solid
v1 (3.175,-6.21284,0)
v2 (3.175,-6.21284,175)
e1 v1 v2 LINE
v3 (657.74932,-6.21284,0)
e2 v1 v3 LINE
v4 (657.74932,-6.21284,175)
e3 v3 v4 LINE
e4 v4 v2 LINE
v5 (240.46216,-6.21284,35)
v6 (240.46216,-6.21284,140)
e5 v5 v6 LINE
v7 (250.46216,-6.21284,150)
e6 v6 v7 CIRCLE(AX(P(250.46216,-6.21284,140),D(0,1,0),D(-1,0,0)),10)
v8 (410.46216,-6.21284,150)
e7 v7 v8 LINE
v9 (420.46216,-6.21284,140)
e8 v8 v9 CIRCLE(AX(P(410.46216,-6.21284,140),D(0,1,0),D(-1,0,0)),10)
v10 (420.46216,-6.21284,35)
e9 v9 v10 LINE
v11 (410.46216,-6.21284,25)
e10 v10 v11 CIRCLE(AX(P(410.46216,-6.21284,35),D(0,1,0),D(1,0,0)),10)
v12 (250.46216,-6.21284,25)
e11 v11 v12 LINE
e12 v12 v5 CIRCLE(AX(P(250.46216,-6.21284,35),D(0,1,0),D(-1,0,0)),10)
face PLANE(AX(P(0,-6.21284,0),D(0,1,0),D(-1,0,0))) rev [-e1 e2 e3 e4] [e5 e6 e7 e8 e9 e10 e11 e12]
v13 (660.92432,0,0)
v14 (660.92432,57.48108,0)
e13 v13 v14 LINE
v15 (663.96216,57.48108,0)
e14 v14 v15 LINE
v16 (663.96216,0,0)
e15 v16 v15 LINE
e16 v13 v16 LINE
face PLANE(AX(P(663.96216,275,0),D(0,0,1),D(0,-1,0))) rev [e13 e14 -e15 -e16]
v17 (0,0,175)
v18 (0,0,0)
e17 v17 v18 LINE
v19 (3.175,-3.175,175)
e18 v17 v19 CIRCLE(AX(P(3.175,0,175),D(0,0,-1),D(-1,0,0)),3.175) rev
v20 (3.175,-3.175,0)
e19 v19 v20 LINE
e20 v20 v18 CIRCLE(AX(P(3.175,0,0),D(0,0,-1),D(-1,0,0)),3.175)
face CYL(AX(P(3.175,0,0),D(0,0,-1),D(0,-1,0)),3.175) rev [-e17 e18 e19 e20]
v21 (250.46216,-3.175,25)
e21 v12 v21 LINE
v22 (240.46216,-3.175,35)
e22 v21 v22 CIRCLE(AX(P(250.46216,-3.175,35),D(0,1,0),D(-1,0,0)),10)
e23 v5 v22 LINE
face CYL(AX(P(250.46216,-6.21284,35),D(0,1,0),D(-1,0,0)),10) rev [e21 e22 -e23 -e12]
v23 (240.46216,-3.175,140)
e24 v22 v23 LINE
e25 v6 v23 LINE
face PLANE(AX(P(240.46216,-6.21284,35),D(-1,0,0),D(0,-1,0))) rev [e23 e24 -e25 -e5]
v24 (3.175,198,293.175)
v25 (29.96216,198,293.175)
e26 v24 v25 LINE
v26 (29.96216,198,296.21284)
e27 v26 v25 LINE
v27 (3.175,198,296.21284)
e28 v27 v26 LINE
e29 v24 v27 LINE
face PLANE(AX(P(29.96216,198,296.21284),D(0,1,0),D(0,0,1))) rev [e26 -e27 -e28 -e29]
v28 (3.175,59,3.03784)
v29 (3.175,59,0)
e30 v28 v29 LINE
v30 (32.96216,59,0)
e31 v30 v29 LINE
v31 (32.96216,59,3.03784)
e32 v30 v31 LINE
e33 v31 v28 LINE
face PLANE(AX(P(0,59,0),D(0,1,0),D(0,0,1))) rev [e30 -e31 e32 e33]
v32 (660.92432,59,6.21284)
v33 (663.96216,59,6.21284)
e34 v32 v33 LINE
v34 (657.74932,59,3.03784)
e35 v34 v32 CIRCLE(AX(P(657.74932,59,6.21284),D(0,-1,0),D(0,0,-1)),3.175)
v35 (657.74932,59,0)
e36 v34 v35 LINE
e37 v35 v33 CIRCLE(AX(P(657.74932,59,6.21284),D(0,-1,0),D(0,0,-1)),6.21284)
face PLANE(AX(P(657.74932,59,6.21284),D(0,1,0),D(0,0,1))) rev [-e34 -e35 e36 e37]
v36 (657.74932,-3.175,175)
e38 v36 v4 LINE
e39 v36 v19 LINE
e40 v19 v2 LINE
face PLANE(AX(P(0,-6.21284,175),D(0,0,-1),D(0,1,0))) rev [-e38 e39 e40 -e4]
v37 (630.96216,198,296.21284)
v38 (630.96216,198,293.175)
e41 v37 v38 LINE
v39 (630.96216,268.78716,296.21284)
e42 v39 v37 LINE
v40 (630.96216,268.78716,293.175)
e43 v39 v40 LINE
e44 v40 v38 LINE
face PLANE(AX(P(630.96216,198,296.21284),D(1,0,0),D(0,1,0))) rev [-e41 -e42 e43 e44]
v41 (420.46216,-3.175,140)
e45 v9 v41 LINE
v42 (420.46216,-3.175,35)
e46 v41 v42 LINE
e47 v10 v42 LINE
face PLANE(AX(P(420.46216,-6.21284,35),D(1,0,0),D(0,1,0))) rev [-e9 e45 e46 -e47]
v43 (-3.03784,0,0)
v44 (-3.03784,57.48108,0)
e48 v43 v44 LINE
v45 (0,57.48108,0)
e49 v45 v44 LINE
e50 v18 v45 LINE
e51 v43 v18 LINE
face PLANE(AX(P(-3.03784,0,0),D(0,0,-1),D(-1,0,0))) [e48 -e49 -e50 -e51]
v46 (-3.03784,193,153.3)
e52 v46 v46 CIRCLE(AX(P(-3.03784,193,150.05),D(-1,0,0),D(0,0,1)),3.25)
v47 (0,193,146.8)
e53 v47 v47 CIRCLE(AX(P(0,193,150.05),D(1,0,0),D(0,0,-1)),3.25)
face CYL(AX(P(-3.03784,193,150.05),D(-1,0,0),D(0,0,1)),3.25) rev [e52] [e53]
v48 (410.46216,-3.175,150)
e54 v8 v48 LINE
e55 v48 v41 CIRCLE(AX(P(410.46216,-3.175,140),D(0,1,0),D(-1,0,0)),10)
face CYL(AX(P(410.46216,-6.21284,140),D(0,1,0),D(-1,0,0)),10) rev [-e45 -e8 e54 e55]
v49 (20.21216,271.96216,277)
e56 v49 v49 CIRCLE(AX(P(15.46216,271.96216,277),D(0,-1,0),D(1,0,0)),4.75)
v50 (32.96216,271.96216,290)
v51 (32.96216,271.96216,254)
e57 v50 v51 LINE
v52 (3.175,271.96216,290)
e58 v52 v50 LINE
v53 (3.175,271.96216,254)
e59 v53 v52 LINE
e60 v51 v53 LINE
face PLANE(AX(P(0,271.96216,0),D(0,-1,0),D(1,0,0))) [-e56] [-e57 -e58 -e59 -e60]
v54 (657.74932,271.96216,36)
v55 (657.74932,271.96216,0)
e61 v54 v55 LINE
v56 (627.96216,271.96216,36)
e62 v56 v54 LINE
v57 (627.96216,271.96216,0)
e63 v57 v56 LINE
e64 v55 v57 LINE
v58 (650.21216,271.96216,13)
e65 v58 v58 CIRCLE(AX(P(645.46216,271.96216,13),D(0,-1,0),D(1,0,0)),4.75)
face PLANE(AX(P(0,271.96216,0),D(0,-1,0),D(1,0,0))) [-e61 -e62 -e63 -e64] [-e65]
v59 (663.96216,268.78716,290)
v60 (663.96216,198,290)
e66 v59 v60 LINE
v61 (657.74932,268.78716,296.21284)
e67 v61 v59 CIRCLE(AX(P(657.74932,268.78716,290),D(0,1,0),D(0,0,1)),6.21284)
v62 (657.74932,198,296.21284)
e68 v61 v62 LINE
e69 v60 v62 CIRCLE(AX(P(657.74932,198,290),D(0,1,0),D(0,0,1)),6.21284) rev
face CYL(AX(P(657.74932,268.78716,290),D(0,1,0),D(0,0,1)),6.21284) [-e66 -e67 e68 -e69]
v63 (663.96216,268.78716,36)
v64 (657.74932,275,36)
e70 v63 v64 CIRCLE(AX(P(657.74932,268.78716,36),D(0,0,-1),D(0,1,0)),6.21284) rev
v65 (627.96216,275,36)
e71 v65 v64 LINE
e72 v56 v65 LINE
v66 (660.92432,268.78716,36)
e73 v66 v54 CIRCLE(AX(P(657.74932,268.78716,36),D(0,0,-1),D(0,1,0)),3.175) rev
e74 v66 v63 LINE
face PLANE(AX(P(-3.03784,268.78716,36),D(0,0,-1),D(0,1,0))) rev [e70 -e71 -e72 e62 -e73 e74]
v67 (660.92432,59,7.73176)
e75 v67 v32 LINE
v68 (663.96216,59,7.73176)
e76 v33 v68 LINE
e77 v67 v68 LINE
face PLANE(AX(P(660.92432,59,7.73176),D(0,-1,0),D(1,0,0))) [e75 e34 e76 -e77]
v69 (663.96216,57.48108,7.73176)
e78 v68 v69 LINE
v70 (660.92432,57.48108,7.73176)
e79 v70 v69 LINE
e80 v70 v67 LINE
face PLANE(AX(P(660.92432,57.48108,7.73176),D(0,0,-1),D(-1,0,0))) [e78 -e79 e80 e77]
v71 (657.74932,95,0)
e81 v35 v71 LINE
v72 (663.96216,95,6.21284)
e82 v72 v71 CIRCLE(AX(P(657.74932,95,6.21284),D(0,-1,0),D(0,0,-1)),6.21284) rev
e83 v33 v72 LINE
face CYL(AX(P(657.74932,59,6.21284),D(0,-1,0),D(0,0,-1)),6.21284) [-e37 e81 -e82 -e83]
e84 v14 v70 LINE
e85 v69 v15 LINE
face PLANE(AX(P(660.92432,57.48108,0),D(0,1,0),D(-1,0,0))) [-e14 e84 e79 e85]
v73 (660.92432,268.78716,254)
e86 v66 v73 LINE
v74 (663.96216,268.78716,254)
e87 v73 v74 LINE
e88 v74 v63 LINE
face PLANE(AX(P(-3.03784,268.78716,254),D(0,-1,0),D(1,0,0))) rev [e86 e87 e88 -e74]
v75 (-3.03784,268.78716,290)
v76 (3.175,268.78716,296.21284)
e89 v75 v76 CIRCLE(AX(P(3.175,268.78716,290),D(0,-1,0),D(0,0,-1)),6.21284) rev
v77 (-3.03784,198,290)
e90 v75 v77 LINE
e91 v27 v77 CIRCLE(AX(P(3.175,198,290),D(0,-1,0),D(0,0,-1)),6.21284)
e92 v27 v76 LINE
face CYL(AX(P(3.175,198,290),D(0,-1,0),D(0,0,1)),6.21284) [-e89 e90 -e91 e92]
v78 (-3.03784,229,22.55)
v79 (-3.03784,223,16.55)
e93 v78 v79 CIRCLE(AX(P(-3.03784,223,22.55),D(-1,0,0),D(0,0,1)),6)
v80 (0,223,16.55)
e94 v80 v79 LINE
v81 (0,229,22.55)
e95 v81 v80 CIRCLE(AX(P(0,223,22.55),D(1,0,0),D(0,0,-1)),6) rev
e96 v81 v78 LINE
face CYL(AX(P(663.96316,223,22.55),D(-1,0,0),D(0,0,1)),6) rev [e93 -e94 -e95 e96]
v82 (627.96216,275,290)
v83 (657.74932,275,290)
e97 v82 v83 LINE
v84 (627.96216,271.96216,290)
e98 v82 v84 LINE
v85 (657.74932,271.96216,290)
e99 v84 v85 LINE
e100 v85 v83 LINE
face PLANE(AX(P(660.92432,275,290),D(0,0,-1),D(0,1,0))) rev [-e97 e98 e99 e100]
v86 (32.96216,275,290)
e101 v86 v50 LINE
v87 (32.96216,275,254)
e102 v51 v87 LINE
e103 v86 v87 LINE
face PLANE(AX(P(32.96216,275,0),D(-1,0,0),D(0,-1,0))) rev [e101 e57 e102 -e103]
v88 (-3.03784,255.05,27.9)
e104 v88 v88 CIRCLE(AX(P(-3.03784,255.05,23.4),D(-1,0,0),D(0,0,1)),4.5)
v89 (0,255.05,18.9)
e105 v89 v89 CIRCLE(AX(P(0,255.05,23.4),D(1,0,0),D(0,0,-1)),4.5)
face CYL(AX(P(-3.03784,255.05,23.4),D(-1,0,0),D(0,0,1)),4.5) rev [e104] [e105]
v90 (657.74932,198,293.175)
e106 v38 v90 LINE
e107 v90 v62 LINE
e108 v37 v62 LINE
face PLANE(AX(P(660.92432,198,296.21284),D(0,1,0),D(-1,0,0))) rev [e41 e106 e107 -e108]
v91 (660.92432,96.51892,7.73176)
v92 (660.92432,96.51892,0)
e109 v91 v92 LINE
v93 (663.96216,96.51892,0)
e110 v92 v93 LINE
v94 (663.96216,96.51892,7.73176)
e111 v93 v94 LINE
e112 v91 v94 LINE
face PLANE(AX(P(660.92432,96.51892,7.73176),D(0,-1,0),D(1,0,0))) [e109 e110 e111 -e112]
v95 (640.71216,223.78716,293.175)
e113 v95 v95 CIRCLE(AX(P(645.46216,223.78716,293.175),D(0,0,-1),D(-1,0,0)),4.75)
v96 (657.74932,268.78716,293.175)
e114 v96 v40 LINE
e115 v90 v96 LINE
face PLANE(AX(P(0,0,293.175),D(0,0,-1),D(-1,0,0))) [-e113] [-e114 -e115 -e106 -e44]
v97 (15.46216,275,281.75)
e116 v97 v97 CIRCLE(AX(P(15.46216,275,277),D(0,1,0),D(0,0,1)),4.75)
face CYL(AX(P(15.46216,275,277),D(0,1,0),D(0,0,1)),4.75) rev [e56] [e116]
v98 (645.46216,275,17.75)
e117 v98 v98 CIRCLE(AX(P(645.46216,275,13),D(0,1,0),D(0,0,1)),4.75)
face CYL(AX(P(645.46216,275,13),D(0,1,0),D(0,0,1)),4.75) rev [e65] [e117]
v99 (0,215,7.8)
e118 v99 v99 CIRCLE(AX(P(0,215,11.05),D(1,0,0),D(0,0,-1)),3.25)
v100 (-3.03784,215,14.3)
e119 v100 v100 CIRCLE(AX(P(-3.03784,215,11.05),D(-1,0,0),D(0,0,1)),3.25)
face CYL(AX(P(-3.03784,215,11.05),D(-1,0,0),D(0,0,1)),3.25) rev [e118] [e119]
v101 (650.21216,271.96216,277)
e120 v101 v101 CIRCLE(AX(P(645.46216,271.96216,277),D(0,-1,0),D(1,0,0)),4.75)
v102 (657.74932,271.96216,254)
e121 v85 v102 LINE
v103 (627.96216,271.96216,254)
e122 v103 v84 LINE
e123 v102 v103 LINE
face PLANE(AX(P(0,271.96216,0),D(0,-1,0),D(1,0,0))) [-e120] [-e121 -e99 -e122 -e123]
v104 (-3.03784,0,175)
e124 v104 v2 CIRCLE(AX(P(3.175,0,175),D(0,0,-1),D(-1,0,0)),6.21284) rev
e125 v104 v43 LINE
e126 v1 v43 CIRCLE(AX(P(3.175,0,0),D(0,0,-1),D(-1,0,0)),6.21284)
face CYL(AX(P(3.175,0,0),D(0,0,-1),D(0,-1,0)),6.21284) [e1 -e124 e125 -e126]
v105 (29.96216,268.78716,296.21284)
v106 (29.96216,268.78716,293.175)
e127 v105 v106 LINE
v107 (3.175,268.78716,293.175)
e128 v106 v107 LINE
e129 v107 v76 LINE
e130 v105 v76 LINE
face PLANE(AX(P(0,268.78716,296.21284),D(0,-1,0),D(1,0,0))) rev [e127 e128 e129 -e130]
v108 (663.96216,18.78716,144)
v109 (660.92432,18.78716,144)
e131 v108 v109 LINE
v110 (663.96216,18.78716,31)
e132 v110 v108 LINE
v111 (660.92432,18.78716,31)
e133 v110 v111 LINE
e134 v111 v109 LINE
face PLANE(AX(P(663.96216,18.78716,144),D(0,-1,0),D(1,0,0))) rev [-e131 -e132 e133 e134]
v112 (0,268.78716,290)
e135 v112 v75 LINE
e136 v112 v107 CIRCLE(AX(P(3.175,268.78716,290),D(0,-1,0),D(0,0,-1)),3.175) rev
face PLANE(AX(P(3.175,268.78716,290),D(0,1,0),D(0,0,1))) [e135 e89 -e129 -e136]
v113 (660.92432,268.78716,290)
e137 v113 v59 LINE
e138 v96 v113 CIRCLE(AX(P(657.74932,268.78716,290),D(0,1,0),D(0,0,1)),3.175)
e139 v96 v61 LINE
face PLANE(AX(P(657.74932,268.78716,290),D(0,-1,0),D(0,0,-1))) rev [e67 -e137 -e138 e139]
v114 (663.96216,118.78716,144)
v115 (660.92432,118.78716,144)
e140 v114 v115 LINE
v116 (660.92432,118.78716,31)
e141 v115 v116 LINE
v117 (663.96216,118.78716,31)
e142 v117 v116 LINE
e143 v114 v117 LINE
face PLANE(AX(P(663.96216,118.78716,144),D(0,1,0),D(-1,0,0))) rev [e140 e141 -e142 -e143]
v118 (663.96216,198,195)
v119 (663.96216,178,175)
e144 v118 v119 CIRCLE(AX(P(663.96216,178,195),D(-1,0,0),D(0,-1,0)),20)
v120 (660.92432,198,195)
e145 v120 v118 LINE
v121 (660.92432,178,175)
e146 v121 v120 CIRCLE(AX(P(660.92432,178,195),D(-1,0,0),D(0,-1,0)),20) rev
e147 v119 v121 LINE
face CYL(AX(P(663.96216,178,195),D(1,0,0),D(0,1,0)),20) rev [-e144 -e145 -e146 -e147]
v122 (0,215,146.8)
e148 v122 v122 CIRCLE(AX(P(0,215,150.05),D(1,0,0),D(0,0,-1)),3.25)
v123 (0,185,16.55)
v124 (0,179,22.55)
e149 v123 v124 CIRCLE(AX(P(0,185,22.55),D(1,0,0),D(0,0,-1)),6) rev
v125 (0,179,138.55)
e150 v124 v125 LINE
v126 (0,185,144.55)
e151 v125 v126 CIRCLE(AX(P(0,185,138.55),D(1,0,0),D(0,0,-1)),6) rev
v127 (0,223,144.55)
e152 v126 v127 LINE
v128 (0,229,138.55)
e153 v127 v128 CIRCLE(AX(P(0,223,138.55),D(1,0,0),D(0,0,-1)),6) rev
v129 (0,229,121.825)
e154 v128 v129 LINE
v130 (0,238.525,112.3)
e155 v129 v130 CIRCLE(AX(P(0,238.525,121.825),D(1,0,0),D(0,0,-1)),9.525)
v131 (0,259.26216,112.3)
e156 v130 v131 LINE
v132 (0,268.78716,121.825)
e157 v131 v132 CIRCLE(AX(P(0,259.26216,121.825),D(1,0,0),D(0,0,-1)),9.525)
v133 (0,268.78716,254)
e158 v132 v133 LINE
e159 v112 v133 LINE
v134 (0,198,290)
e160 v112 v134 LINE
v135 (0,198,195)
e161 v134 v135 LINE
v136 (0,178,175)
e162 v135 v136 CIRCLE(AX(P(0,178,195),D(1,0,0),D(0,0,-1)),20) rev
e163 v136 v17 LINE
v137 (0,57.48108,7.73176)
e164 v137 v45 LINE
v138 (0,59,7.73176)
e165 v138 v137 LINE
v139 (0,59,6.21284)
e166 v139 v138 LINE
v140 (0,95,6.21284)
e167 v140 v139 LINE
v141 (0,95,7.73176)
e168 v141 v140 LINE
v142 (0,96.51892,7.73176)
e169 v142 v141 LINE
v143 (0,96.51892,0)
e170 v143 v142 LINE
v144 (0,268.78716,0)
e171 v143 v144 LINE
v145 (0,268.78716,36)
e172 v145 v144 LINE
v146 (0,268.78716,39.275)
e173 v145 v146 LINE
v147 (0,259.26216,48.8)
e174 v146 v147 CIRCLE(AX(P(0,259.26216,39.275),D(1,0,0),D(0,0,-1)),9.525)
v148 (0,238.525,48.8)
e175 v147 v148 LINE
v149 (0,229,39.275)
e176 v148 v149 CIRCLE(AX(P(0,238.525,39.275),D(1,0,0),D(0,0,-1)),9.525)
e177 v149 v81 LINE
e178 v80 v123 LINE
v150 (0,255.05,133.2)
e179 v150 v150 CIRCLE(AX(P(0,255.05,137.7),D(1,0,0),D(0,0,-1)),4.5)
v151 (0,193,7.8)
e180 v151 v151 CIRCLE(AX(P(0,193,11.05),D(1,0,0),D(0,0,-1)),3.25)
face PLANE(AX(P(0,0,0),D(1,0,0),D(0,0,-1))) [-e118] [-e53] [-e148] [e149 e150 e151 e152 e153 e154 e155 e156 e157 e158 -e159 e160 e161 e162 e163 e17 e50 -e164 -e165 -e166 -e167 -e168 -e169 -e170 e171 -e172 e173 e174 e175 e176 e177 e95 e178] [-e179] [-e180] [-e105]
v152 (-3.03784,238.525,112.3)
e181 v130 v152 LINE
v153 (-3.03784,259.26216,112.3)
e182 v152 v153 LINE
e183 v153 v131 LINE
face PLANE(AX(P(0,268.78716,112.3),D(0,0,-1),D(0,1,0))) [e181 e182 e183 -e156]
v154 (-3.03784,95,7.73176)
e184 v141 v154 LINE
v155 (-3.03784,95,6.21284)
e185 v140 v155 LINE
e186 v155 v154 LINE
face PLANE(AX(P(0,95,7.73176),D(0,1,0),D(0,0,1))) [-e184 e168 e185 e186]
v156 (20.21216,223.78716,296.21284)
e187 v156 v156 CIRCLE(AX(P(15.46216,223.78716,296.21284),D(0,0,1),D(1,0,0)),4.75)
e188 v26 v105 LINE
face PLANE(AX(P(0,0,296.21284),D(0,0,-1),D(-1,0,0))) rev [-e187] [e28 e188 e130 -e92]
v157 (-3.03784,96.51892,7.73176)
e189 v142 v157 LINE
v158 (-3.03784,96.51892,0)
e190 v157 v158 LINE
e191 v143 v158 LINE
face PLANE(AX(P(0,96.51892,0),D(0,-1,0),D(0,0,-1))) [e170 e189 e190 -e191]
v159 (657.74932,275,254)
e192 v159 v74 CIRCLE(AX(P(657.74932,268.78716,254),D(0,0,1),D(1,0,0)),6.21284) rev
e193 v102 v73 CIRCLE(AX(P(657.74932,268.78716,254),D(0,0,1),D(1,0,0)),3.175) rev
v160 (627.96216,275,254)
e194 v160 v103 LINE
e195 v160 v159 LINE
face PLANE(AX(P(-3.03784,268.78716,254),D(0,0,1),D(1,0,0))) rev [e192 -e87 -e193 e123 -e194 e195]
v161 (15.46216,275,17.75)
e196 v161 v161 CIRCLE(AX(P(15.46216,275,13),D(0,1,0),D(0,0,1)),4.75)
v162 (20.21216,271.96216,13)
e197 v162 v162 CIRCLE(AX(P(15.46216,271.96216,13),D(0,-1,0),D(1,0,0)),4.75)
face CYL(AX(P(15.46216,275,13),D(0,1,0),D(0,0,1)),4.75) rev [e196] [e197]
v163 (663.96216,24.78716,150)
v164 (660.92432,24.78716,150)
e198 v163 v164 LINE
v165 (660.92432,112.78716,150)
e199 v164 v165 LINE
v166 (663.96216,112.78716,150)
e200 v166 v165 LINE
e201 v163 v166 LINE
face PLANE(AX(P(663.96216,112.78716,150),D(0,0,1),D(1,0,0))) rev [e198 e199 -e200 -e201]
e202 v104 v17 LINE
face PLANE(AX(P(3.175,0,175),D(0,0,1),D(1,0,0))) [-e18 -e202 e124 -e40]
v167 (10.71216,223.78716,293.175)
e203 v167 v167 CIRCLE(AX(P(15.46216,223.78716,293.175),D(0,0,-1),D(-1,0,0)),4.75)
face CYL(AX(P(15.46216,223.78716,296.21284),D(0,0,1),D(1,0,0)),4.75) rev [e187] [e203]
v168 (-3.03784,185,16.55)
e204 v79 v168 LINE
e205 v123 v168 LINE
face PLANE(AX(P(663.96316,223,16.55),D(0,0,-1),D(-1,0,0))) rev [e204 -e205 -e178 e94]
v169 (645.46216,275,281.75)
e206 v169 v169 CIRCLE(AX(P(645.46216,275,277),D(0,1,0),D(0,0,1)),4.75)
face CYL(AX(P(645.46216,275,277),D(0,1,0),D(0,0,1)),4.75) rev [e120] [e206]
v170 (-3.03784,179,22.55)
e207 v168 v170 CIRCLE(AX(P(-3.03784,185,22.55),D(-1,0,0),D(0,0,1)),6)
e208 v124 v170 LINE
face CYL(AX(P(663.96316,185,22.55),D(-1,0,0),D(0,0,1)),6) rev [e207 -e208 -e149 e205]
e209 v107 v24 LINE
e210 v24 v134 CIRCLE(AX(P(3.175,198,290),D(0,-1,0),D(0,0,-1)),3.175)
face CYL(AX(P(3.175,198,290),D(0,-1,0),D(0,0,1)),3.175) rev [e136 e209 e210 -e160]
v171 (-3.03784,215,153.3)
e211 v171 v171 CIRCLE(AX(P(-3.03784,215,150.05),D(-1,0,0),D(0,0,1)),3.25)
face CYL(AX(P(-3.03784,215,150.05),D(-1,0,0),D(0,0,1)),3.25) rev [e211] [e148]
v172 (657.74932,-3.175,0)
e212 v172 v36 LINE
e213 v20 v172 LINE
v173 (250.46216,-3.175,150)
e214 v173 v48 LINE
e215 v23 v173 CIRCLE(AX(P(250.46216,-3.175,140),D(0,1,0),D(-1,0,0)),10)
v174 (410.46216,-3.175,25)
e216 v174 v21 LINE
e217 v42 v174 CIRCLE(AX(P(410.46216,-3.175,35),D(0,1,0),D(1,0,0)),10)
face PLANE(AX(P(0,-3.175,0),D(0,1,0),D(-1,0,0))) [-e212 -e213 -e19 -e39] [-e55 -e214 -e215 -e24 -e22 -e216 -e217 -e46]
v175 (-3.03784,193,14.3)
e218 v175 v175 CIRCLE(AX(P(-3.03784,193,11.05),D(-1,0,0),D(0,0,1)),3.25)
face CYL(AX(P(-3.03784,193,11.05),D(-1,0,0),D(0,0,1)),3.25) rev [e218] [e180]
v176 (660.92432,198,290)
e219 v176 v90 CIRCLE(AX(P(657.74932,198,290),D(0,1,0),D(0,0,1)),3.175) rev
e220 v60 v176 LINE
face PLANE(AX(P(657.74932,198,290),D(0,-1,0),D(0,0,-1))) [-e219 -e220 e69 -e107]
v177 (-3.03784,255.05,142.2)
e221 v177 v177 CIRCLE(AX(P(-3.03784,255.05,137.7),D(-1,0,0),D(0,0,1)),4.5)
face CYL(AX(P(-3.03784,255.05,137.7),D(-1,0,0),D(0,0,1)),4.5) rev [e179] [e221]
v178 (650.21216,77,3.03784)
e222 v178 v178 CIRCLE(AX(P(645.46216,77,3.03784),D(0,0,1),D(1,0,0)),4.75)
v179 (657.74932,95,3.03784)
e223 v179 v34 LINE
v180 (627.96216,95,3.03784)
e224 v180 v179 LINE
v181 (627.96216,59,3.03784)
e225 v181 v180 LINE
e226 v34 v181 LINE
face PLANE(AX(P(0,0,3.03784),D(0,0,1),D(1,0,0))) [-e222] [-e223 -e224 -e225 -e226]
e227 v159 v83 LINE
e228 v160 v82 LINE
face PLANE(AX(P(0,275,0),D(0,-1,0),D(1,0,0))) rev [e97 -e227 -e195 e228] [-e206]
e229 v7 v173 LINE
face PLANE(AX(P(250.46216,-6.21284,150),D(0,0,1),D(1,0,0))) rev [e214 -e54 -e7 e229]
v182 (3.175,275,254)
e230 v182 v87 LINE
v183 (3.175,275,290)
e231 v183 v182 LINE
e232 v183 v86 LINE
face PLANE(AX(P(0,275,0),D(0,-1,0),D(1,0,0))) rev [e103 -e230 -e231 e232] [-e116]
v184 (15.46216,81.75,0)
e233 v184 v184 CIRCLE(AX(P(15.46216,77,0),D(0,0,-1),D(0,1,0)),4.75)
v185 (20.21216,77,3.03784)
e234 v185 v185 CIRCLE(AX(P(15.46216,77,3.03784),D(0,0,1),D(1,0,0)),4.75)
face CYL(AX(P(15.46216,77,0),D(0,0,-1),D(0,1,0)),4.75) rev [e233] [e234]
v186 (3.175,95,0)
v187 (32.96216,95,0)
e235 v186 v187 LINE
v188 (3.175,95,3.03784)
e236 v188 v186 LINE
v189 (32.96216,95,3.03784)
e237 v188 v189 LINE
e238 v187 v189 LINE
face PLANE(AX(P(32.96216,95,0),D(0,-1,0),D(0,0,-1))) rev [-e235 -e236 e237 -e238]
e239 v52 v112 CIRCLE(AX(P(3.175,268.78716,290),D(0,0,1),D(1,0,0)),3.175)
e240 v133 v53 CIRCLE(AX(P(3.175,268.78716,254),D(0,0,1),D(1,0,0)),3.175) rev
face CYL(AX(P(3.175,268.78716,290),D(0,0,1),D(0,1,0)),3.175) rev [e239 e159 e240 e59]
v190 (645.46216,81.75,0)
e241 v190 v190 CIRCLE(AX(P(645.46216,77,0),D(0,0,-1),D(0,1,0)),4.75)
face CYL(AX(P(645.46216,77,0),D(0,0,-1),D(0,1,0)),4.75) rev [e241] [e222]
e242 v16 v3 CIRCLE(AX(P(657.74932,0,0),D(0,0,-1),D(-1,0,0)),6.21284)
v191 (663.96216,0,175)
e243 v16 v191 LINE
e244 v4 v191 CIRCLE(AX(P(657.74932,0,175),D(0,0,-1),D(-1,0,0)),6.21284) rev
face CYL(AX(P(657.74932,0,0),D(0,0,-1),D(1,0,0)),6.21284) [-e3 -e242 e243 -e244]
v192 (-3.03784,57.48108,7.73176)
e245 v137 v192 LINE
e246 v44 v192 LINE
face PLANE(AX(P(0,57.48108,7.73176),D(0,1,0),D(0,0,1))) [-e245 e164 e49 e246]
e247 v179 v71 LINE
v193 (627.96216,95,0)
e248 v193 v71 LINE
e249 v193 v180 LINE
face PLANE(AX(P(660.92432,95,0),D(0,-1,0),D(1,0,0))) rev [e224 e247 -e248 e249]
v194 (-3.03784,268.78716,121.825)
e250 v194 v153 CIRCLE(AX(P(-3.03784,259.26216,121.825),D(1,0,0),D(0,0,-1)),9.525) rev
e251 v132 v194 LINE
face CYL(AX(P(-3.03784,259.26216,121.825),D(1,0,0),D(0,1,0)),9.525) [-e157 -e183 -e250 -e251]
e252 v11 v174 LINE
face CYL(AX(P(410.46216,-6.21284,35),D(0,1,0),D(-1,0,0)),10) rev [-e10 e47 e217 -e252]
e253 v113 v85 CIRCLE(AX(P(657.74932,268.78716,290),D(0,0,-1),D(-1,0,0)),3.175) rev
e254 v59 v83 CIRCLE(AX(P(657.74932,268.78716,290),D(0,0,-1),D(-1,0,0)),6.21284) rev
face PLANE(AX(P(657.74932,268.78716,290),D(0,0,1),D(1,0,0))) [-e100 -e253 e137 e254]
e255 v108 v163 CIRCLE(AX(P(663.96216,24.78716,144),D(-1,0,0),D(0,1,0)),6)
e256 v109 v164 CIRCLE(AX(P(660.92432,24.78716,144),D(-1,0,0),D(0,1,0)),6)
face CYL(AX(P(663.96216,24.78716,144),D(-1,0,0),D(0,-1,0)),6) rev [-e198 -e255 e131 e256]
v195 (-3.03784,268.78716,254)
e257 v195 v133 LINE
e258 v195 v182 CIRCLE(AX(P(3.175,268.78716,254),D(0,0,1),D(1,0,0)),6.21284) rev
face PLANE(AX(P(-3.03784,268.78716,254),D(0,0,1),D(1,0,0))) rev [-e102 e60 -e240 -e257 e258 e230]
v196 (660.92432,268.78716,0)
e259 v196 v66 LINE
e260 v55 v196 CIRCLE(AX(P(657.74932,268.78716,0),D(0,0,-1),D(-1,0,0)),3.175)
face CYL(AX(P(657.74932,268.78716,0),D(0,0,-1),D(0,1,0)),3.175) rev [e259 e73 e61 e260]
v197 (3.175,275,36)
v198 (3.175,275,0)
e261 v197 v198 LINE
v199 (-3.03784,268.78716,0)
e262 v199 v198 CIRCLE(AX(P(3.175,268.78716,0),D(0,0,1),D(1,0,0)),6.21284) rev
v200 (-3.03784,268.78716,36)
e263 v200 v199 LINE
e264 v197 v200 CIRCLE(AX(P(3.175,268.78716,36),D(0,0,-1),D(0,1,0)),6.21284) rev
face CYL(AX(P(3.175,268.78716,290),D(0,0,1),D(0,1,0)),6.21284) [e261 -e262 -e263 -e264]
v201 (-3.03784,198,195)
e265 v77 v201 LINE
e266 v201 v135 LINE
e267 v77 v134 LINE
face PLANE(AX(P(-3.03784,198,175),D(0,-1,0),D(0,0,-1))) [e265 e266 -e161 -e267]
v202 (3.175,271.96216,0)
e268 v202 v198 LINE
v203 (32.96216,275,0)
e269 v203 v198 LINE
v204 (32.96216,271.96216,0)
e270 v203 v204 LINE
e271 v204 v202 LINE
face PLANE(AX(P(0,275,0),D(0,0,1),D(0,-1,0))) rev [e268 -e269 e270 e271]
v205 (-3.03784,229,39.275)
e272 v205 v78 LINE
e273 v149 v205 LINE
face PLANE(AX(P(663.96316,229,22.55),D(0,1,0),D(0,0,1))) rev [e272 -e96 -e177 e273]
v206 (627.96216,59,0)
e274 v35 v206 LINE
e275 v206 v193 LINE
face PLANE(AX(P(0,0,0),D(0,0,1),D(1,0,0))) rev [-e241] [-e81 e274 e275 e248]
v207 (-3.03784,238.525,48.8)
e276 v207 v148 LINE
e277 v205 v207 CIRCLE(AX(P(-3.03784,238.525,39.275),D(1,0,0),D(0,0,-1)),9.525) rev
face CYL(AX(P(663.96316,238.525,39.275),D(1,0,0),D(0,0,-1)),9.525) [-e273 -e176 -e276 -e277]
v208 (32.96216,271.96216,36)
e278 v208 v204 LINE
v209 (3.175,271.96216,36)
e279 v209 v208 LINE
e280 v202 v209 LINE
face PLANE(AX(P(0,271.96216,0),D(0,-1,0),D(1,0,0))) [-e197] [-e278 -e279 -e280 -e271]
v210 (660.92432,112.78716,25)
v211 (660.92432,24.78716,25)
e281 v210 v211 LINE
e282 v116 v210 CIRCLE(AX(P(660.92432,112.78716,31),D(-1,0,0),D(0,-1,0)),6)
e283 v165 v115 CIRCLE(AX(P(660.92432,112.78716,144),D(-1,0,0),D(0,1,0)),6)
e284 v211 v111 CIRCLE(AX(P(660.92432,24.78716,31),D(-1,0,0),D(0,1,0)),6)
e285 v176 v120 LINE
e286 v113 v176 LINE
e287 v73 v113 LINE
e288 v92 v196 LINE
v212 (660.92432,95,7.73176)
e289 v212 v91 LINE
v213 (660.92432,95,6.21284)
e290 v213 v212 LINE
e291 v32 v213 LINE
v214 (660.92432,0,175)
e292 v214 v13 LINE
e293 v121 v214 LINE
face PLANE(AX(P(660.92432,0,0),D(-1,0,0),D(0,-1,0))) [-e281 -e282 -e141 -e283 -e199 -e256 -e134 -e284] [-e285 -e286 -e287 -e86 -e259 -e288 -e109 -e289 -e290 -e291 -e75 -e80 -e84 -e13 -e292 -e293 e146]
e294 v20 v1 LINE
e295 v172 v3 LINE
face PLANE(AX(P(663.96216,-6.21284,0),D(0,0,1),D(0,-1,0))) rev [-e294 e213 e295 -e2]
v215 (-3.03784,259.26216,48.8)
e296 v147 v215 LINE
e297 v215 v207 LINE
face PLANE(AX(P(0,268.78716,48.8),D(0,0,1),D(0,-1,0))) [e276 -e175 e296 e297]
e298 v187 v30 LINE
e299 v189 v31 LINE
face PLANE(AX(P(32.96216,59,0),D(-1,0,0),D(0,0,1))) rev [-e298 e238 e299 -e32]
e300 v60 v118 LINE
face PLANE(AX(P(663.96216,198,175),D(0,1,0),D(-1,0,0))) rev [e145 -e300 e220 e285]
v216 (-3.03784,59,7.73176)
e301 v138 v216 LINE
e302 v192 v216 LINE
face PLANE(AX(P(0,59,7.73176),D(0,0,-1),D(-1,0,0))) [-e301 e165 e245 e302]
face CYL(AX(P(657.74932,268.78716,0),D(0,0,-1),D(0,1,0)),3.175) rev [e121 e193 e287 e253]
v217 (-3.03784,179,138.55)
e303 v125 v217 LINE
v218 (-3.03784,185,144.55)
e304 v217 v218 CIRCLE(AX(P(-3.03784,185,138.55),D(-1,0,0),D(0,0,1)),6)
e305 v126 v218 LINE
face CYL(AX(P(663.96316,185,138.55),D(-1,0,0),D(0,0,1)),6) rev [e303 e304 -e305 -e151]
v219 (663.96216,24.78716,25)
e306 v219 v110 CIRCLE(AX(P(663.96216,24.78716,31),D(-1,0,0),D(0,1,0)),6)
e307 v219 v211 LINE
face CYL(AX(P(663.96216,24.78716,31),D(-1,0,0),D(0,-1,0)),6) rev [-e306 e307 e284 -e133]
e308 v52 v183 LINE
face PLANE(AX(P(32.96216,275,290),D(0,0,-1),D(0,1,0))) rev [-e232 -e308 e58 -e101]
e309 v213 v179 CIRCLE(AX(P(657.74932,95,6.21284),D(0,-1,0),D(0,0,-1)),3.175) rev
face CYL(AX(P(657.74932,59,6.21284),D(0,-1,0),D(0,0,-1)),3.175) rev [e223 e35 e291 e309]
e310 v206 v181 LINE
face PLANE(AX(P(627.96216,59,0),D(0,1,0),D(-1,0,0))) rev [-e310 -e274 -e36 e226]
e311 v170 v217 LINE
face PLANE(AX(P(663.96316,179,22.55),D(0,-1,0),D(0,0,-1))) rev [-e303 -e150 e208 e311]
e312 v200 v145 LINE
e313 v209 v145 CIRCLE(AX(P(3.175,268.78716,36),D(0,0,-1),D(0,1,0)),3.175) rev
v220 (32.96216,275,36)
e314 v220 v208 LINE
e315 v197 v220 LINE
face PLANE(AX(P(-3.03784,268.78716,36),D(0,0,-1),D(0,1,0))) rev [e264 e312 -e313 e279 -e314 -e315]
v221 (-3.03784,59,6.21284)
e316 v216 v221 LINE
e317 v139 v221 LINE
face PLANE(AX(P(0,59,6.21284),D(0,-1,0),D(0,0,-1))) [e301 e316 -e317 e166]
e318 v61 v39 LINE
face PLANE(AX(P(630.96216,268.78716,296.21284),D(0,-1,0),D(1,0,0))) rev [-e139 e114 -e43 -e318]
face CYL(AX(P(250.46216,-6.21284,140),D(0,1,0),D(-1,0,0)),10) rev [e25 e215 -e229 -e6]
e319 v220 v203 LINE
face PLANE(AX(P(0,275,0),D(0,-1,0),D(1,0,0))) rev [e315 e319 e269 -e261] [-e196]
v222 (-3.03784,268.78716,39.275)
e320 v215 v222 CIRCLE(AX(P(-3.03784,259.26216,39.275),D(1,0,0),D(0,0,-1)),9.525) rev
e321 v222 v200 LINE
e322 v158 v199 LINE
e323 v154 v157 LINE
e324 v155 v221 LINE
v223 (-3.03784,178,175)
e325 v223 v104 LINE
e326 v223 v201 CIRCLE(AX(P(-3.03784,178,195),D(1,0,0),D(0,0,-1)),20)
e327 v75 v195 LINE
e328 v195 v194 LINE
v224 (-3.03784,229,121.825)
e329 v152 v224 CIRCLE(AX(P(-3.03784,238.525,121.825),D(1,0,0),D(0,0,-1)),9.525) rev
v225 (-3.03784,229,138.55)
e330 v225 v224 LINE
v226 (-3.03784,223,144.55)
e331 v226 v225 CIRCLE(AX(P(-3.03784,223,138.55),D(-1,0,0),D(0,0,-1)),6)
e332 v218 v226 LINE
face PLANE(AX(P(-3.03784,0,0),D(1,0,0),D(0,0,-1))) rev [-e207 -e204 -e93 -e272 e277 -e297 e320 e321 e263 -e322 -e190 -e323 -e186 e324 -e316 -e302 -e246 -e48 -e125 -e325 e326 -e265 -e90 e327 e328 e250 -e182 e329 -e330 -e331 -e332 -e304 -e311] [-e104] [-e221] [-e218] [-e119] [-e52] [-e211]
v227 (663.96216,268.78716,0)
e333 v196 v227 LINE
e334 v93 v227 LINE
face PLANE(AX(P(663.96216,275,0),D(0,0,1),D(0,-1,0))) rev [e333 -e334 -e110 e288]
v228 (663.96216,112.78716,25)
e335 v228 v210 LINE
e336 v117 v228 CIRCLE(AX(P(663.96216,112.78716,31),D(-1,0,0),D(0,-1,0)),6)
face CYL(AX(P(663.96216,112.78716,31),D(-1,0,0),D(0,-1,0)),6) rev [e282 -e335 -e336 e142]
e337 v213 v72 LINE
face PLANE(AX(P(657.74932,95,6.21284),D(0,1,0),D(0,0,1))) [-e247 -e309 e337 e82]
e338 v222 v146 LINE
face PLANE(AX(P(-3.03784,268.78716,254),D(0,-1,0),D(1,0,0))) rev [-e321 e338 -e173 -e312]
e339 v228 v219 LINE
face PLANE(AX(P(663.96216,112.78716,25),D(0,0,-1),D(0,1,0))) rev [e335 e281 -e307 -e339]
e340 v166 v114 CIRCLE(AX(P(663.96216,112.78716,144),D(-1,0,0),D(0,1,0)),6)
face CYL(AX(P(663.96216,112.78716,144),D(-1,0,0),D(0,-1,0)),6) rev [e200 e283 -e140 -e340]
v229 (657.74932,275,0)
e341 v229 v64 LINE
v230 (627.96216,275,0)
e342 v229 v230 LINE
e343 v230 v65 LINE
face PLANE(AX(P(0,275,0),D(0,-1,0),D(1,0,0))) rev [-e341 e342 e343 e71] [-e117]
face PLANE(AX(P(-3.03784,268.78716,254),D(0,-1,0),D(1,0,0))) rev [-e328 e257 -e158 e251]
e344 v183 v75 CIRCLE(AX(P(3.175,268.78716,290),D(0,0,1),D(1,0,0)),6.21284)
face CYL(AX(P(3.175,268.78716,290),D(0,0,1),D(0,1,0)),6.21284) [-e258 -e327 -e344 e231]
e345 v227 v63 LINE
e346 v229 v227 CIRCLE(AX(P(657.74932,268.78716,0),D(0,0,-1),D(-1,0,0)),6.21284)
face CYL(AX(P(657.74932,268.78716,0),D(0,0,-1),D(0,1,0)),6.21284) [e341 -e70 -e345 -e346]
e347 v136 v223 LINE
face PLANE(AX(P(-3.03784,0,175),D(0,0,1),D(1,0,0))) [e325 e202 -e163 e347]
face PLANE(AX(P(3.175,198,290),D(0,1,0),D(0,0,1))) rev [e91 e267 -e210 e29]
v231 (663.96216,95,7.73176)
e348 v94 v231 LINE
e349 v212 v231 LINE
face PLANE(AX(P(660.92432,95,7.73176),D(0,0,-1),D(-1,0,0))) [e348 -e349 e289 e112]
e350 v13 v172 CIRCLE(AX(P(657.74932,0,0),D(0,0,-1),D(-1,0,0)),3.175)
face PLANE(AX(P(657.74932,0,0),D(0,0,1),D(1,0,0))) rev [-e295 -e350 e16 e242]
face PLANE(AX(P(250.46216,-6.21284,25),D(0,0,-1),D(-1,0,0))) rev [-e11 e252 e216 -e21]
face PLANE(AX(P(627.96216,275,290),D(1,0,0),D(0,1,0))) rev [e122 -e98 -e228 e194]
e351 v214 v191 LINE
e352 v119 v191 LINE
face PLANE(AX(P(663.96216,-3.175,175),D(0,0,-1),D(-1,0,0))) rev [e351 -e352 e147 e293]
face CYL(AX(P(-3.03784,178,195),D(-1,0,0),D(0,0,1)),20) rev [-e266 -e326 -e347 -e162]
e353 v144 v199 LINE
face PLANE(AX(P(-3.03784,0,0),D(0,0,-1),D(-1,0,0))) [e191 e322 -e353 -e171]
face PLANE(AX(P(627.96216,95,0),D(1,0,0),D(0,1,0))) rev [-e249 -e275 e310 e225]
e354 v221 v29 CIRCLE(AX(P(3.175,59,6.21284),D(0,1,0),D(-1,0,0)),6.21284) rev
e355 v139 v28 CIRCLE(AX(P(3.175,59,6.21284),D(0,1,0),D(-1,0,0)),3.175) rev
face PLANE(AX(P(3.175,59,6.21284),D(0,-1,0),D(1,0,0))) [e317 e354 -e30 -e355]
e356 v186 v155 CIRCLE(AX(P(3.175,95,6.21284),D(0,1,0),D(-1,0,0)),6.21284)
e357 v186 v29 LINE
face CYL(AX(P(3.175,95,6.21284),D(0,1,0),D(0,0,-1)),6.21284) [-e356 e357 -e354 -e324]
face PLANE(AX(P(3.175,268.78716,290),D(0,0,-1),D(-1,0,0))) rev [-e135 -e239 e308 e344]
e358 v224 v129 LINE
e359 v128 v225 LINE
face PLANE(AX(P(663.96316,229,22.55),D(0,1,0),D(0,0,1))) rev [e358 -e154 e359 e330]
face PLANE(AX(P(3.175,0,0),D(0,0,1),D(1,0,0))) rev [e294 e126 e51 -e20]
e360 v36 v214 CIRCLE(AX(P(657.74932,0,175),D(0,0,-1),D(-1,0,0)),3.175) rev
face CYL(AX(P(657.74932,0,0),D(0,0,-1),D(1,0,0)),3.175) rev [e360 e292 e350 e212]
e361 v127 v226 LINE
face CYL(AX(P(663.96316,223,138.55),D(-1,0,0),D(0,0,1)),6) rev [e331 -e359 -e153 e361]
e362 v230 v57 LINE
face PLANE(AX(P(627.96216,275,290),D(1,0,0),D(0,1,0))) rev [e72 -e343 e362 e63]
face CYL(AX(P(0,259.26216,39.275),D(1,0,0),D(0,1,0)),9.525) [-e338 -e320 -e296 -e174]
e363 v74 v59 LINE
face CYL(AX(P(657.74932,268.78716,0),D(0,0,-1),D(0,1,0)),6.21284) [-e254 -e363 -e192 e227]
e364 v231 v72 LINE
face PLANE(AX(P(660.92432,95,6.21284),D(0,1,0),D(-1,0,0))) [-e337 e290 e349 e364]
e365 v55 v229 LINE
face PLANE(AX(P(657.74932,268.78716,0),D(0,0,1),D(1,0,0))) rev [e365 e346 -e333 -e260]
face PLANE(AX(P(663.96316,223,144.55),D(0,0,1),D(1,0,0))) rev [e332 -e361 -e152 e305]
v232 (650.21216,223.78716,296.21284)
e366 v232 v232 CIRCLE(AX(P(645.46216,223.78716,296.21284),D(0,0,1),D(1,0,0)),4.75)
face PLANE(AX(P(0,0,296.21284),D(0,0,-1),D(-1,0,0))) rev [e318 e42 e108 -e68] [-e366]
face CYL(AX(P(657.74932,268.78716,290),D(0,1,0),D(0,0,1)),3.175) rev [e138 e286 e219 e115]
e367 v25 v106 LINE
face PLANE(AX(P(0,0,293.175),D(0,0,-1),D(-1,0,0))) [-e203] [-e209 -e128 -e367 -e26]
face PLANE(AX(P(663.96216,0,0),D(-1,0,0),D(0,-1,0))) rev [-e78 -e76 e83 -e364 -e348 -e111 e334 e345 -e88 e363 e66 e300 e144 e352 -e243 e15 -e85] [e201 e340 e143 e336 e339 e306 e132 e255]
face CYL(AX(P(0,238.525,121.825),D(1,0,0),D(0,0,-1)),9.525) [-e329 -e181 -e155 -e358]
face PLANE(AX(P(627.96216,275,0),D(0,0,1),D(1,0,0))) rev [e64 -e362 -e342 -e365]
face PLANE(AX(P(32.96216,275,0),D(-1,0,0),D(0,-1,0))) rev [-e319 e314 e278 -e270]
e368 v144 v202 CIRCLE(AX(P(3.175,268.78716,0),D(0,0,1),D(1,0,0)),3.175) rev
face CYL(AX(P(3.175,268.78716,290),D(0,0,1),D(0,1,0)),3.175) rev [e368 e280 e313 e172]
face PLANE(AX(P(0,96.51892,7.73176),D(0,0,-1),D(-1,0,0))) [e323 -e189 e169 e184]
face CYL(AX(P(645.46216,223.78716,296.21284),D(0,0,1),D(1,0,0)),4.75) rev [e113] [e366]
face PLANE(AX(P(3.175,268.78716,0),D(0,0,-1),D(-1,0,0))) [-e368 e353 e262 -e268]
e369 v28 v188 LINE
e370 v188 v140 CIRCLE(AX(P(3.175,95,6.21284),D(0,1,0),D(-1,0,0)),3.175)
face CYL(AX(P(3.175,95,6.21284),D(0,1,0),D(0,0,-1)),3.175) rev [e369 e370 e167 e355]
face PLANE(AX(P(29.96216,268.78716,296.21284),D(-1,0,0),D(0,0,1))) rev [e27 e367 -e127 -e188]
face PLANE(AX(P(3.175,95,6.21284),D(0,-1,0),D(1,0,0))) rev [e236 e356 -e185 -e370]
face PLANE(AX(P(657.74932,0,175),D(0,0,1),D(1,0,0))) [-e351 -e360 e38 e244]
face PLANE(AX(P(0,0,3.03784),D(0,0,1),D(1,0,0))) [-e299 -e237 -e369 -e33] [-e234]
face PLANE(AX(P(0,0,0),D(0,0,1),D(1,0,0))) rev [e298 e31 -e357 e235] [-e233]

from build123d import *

# Parameters (mm, degrees)
BASE_FLANGE1_DEPTH              = 3.03784
EDGE_FLANGE2_DEPTH              = 175
EDGE_FLANGE3_STRIP_W            = 18.50136
EDGE_FLANGE3_STRIP_H            = 3.03784
EDGE_FLANGE3_STRIP_CUT_DEPTH    = 175
EDGE_FLANGE3_DEPTH              = 175
EDGE_FLANGE3_FLAT_DEPTH         = 3.03784
FILLET1_R                       = 20
EDGE_FLANGE6_STRIP_W            = 18.50136
EDGE_FLANGE6_STRIP_H            = 3.03784
EDGE_FLANGE6_STRIP_CUT_DEPTH    = 290
EDGE_FLANGE6_STRIP_2_W          = 18.50136
EDGE_FLANGE6_STRIP_2_H          = 3.03784
EDGE_FLANGE6_STRIP_CUT_2_DEPTH  = 290
EDGE_FLANGE6_DEPTH              = 290
EDGE_FLANGE6_BEND_DEPTH         = 290
SKETCH38_W                      = 218
SKETCH38_H                      = 6.21284
CUT_EXTRUDE1_DEPTH              = 778.569289517
EDGE_FLANGE7_STRIP_W            = 18.50136
EDGE_FLANGE7_STRIP_H            = 3.03784
EDGE_FLANGE7_STRIP_CUT_DEPTH    = 36
EDGE_FLANGE7_RELIEF_W           = 20.02028
EDGE_FLANGE7_RELIEF_H           = 1.51892
EDGE_FLANGE7_RELIEF_CUT_DEPTH   = 3.03784
EDGE_FLANGE7_STRIP_2_W          = 18.50136
EDGE_FLANGE7_STRIP_2_H          = 3.03784
EDGE_FLANGE7_STRIP_CUT_2_DEPTH  = 36
EDGE_FLANGE7_RELIEF_2_W         = 20.02028
EDGE_FLANGE7_RELIEF_2_H         = 1.51892
EDGE_FLANGE7_RELIEF_CUT_2_DEPTH = 3.03784
EDGE_FLANGE7_DEPTH              = 36
EDGE_FLANGE7_BEND_DEPTH         = 36
EDGE_FLANGE8_DEPTH              = 70.78716
EDGE_FLANGE8_BEND_DEPTH         = 70.78716
F_9_5_9_5_DIAMETER_HOLE1_D      = 9.5
F_9_5_9_5_DIAMETER_HOLE1_DEPTH  = 3.03784
F_9_5_9_5_DIAMETER_HOLE2_D      = 9.5
CUT_EXTRUDE2_DEPTH              = 778.31126101
M5_CLEARANCE_HOLE1_D            = 6.5
M5_CLEARANCE_HOLE1_DEPTH        = 3.03784
CUT_EXTRUDE3_REACH              = 781.908
F_9_5_9_5_DIAMETER_HOLE3_D      = 9.5
CUT_EXTRUDE4_DEPTH              = 779.440188529
CUT_EXTRUDE5_REACH              = 781.908
SKETCH62_W                      = 63.5
SKETCH62_H                      = 39.78716
FILLET2_R                       = 9.525
M8_CLEARANCE_HOLE1_D            = 9
M8_CLEARANCE_HOLE1_DEPTH        = 3.03784


# Sheet-metal steps are written as plain solids
with BuildPart() as part:
    # Sketch1 → Base-Flange1 (new body)
    with BuildSketch(Plane(origin=(0, 0, 0), x_dir=(0, 0, -1), z_dir=(1, 0, 0))):
        Polygon((-175, 198), (-290, 198), (-290, 275), (0, 275), (0, 0), (-175, 0), align=None)
    extrude(amount=-BASE_FLANGE1_DEPTH)

    # Edge-Flange2 section (across the edge) → Edge-Flange2 (add)
    with BuildSketch(Plane(origin=(0, -3.175, 175), x_dir=(0, 1, 0), z_dir=(0, 0, -1))):
        with BuildLine():
            Line((-3.03784, 3.175), (-3.03784, 663.96216))
            Line((-3.03784, 663.96216), (0, 663.96216))
            Line((0, 663.96216), (0, 3.175))
            ThreePointArc((0, 3.175), (0.92993597, 0.92993597), (3.175, 0))
            Line((3.175, 0), (3.175, -3.03784))
            ThreePointArc((3.175, -3.03784), (-1.218141294, -1.218141294), (-3.03784, 3.175))
        make_face()
    extrude(amount=EDGE_FLANGE2_DEPTH)

    # Edge-Flange3 strip (across the edge) → Edge-Flange3 strip cut (cut)
    with BuildSketch(Plane(origin=(663.96216, -3.175, 175), x_dir=(-1, 0, 0), z_dir=(0, 0, -1))):
        with Locations((-3.03784, -1.51892)):
            Rectangle(EDGE_FLANGE3_STRIP_W, EDGE_FLANGE3_STRIP_H)
    extrude(amount=EDGE_FLANGE3_STRIP_CUT_DEPTH, mode=Mode.SUBTRACT)

    # Edge-Flange3 bend section (across the edge) → Edge-Flange3 (add)
    with BuildSketch(Plane(origin=(663.96216, -3.175, 175), x_dir=(-1, 0, 0), z_dir=(0, 0, -1))):
        with BuildLine():
            Line((0, 3.175), (3.03784, 3.175))
            ThreePointArc((3.03784, 3.175), (3.96777597, 0.92993597), (6.21284, 0))
            Line((6.21284, 0), (6.21284, -3.03784))
            ThreePointArc((6.21284, -3.03784), (1.819698706, -1.218141294), (0, 3.175))
        make_face()
    extrude(amount=EDGE_FLANGE3_DEPTH)

    # Edge-Flange3 profile (on flange) → Edge-Flange3 flat (add)
    with BuildSketch(Plane(origin=(663.96216, -3.175, 0), x_dir=(0, 0, -1), z_dir=(1, 0, 0))):
        Polygon((0, 3.175), (0, 278.175), (-290, 278.175), (-290, 201.175), (-175, 201.175), (-175, 3.175), align=None)
    extrude(amount=-EDGE_FLANGE3_FLAT_DEPTH)

    # Fillet1
    fillet1_edges = [part.edges().sort_by_distance(p)[0] for p in [
        (-1.51892, 198, 175),
        (662.44324, 198, 175),
    ]]
    fillet(fillet1_edges, radius=FILLET1_R)

    # Edge-Flange6 strip (across the edge) → Edge-Flange6 strip cut (cut)
    with BuildSketch(Plane(origin=(0, 275, 0), x_dir=(0, -1, 0), z_dir=(0, 0, 1))):
        with Locations((-3.03784, -1.51892)):
            Rectangle(EDGE_FLANGE6_STRIP_W, EDGE_FLANGE6_STRIP_H)
    extrude(amount=EDGE_FLANGE6_STRIP_CUT_DEPTH, mode=Mode.SUBTRACT)

    # Edge-Flange6 strip 2 (across the edge) → Edge-Flange6 strip cut 2 (cut)
    with BuildSketch(Plane(origin=(660.92432, 275, 290), x_dir=(0, -1, 0), z_dir=(0, 0, -1))):
        with Locations((-3.03784, -1.51892)):
            Rectangle(EDGE_FLANGE6_STRIP_2_W, EDGE_FLANGE6_STRIP_2_H)
    extrude(amount=EDGE_FLANGE6_STRIP_CUT_2_DEPTH, mode=Mode.SUBTRACT)

    # Edge-Flange6 section (across the edge) → Edge-Flange6 (add)
    with BuildSketch(Plane(origin=(0, 275, 0), x_dir=(0, -1, 0), z_dir=(0, 0, 1))):
        with BuildLine():
            Line((0, 3.175), (0, 32.96216))
            Line((0, 32.96216), (3.03784, 32.96216))
            Line((3.03784, 32.96216), (3.03784, 3.175))
            ThreePointArc((3.03784, 3.175), (3.96777597, 0.92993597), (6.21284, 0))
            Line((6.21284, 0), (6.21284, -3.03784))
            ThreePointArc((6.21284, -3.03784), (1.819698706, -1.218141294), (0, 3.175))
        make_face()
    extrude(amount=EDGE_FLANGE6_DEPTH)

    # Edge-Flange6 section 2 (across the edge) → Edge-Flange6 bend (add)
    with BuildSketch(Plane(origin=(660.92432, 275, 290), x_dir=(0, -1, 0), z_dir=(0, 0, -1))):
        with BuildLine():
            Line((0, 3.175), (0, 32.96216))
            Line((0, 32.96216), (3.03784, 32.96216))
            Line((3.03784, 32.96216), (3.03784, 3.175))
            ThreePointArc((3.03784, 3.175), (3.96777597, 0.92993597), (6.21284, 0))
            Line((6.21284, 0), (6.21284, -3.03784))
            ThreePointArc((6.21284, -3.03784), (1.819698706, -1.218141294), (0, 3.175))
        make_face()
    extrude(amount=EDGE_FLANGE6_BEND_DEPTH)

    # Sketch38 → Cut-Extrude1 (cut, through all)
    with BuildSketch(Plane(origin=(663.96216, 0, 0), x_dir=(0, 0, -1), z_dir=(1, 0, 0))):
        with Locations((-145, 271.89358)):
            Rectangle(SKETCH38_W, SKETCH38_H)
    extrude(amount=-CUT_EXTRUDE1_DEPTH, mode=Mode.SUBTRACT)

    # Edge-Flange7 strip (across the edge) → Edge-Flange7 strip cut (cut)
    with BuildSketch(Plane.ZX.offset(59)):
        with Locations((-3.03784, -1.51892)):
            Rectangle(EDGE_FLANGE7_STRIP_W, EDGE_FLANGE7_STRIP_H)
    extrude(amount=EDGE_FLANGE7_STRIP_CUT_DEPTH, mode=Mode.SUBTRACT)

    # Edge-Flange7 relief (on the sheet) → Edge-Flange7 relief cut (cut)
    with BuildSketch(Plane(origin=(0, 59, 6.21284), x_dir=(0, 0, 1), z_dir=(1, 0, 0))):
        with Locations((-8.49122, 0.75946)):
            Rectangle(EDGE_FLANGE7_RELIEF_W, EDGE_FLANGE7_RELIEF_H)
        with Locations((-8.49122, -36.75946)):
            Rectangle(EDGE_FLANGE7_RELIEF_W, EDGE_FLANGE7_RELIEF_H)
    extrude(amount=-EDGE_FLANGE7_RELIEF_CUT_DEPTH, mode=Mode.SUBTRACT)

    # Edge-Flange7 strip 2 (across the edge) → Edge-Flange7 strip cut 2 (cut)
    with BuildSketch(Plane(origin=(660.92432, 95, 0), x_dir=(0, 0, 1), z_dir=(0, -1, 0))):
        with Locations((-3.03784, -1.51892)):
            Rectangle(EDGE_FLANGE7_STRIP_2_W, EDGE_FLANGE7_STRIP_2_H)
    extrude(amount=EDGE_FLANGE7_STRIP_CUT_2_DEPTH, mode=Mode.SUBTRACT)

    # Edge-Flange7 relief 2 (on the sheet) → Edge-Flange7 relief cut 2 (cut)
    with BuildSketch(Plane(origin=(660.92432, 95, 6.21284), x_dir=(0, 0, 1), z_dir=(-1, 0, 0))):
        with Locations((-8.49122, 0.75946)):
            Rectangle(EDGE_FLANGE7_RELIEF_2_W, EDGE_FLANGE7_RELIEF_2_H)
        with Locations((-8.49122, -36.75946)):
            Rectangle(EDGE_FLANGE7_RELIEF_2_W, EDGE_FLANGE7_RELIEF_2_H)
    extrude(amount=-EDGE_FLANGE7_RELIEF_CUT_2_DEPTH, mode=Mode.SUBTRACT)

    # Edge-Flange7 section (across the edge) → Edge-Flange7 (add)
    with BuildSketch(Plane.ZX.offset(59)):
        with BuildLine():
            Line((0, 3.175), (0, 32.96216))
            Line((0, 32.96216), (3.03784, 32.96216))
            Line((3.03784, 32.96216), (3.03784, 3.175))
            ThreePointArc((3.03784, 3.175), (3.96777597, 0.92993597), (6.21284, 0))
            Line((6.21284, 0), (6.21284, -3.03784))
            ThreePointArc((6.21284, -3.03784), (1.819698706, -1.218141294), (0, 3.175))
        make_face()
    extrude(amount=EDGE_FLANGE7_DEPTH)

    # Edge-Flange7 section 2 (across the edge) → Edge-Flange7 bend (add)
    with BuildSketch(Plane(origin=(660.92432, 95, 0), x_dir=(0, 0, 1), z_dir=(0, -1, 0))):
        with BuildLine():
            Line((0, 3.175), (0, 32.96216))
            Line((0, 32.96216), (3.03784, 32.96216))
            Line((3.03784, 32.96216), (3.03784, 3.175))
            ThreePointArc((3.03784, 3.175), (3.96777597, 0.92993597), (6.21284, 0))
            Line((6.21284, 0), (6.21284, -3.03784))
            ThreePointArc((6.21284, -3.03784), (1.819698706, -1.218141294), (0, 3.175))
        make_face()
    extrude(amount=EDGE_FLANGE7_BEND_DEPTH)

    # Edge-Flange8 section (across the edge) → Edge-Flange8 (add)
    with BuildSketch(Plane(origin=(0, 268.78716, 293.175), x_dir=(0, 0, -1), z_dir=(0, -1, 0))):
        with BuildLine():
            Line((-3.03784, 3.175), (-3.03784, 29.96216))
            Line((-3.03784, 29.96216), (0, 29.96216))
            Line((0, 29.96216), (0, 3.175))
            ThreePointArc((0, 3.175), (0.92993597, 0.92993597), (3.175, 0))
            Line((3.175, 0), (3.175, -3.03784))
            ThreePointArc((3.175, -3.03784), (-1.218141294, -1.218141294), (-3.03784, 3.175))
        make_face()
    extrude(amount=EDGE_FLANGE8_DEPTH)

    # Edge-Flange8 section 2 (across the edge) → Edge-Flange8 bend (add)
    with BuildSketch(Plane(origin=(660.92432, 198, 293.175), x_dir=(0, 0, -1), z_dir=(0, 1, 0))):
        with BuildLine():
            Line((-3.03784, 3.175), (-3.03784, 29.96216))
            Line((-3.03784, 29.96216), (0, 29.96216))
            Line((0, 29.96216), (0, 3.175))
            ThreePointArc((0, 3.175), (0.92993597, 0.92993597), (3.175, 0))
            Line((3.175, 0), (3.175, -3.03784))
            ThreePointArc((3.175, -3.03784), (-1.218141294, -1.218141294), (-3.03784, 3.175))
        make_face()
    extrude(amount=EDGE_FLANGE8_BEND_DEPTH)

    # Ø9.5 (9.5) Diameter Hole1
    with Locations(Plane(origin=(0, 275, 0), x_dir=(1, 0, 0), z_dir=(0, 1, 0))):
        with Locations((15.46216, -13), (15.46216, -277), (645.46216, -277), (645.46216, -13)):
            Hole(F_9_5_9_5_DIAMETER_HOLE1_D / 2, depth=F_9_5_9_5_DIAMETER_HOLE1_DEPTH)

    # Ø9.5 (9.5) Diameter Hole2 (through all)
    with Locations(Plane(origin=(0, 0, 0), x_dir=(-1, 0, 0), z_dir=(0, 0, -1))):
        with Locations((-645.46216, 77), (-15.46216, 77)):
            Hole(F_9_5_9_5_DIAMETER_HOLE2_D / 2)

    # Sketch49 → Cut-Extrude2 (cut, through all)
    with BuildSketch(Plane.ZY.offset(-660.92432)):
        with BuildLine():
            Line((144, 118.78716), (31, 118.78716))
            ThreePointArc((31, 118.78716), (26.757359313, 117.029800687), (25, 112.78716))
            Line((25, 112.78716), (25, 24.78716))
            ThreePointArc((25, 24.78716), (26.757359313, 20.544519313), (31, 18.78716))
            Line((31, 18.78716), (144, 18.78716))
            ThreePointArc((144, 18.78716), (148.242640687, 20.544519313), (150, 24.78716))
            Line((150, 24.78716), (150, 112.78716))
            ThreePointArc((150, 112.78716), (148.242640687, 117.029800687), (144, 118.78716))
        make_face()
    extrude(amount=-CUT_EXTRUDE2_DEPTH, mode=Mode.SUBTRACT)

    # M5 Clearance Hole1
    with Locations(Plane.ZY.offset(3.03784)):
        with Locations((11.05, 215), (11.05, 193), (150.05, 215), (150.05, 193)):
            Hole(M5_CLEARANCE_HOLE1_D / 2, depth=M5_CLEARANCE_HOLE1_DEPTH)

    # Sketch52 → Cut-Extrude3 (cut, up to next)
    with BuildSketch(Plane.ZY.offset(3.03784), mode=Mode.PRIVATE) as cut_extrude3_sk1:
        with BuildLine():
            Line((22.55, 229), (138.55, 229))
            ThreePointArc((138.55, 229), (142.792640687, 227.242640687), (144.55, 223))
            Line((144.55, 223), (144.55, 185))
            ThreePointArc((144.55, 185), (142.792640687, 180.757359313), (138.55, 179))
            Line((138.55, 179), (22.55, 179))
            ThreePointArc((22.55, 179), (18.307359313, 180.757359313), (16.55, 185))
            Line((16.55, 185), (16.55, 223))
            ThreePointArc((16.55, 223), (18.307359313, 227.242640687), (22.55, 229))
        make_face()
    cut_extrude3_tool1 = extrude(cut_extrude3_sk1.sketch, amount=-CUT_EXTRUDE3_REACH, mode=Mode.PRIVATE) & part.part
    add(cut_extrude3_tool1.solids().sort_by_distance((-3.03784, 204, 80.55))[0], mode=Mode.SUBTRACT)

    # Ø9.5 (9.5) Diameter Hole3 (through all)
    with Locations(Plane.XY.offset(296.21284)):
        with Locations((645.46216, 223.78716), (15.46216, 223.78716)):
            Hole(F_9_5_9_5_DIAMETER_HOLE3_D / 2)

    # Sketch61 → Cut-Extrude4 (cut, through all)
    with BuildSketch(Plane(origin=(0, -3.175, 0), x_dir=(1, 0, 0), z_dir=(0, 1, 0))):
        with BuildLine():
            Line((250.46216, -25), (410.46216, -25))
            ThreePointArc((410.46216, -25), (417.533227812, -27.928932188), (420.46216, -35))
            Line((420.46216, -35), (420.46216, -140))
            ThreePointArc((420.46216, -140), (417.533227812, -147.071067812), (410.46216, -150))
            Line((410.46216, -150), (250.46216, -150))
            ThreePointArc((250.46216, -150), (243.391092188, -147.071067812), (240.46216, -140))
            Line((240.46216, -140), (240.46216, -35))
            ThreePointArc((240.46216, -35), (243.391092188, -27.928932188), (250.46216, -25))
        make_face()
    extrude(amount=-CUT_EXTRUDE4_DEPTH, mode=Mode.SUBTRACT)

    # Sketch62 → Cut-Extrude5 (cut, up to next)
    with BuildSketch(Plane.ZY.offset(3.03784), mode=Mode.PRIVATE) as cut_extrude5_sk1:
        with Locations((80.55, 248.89358)):
            Rectangle(SKETCH62_W, SKETCH62_H)
    cut_extrude5_tool1 = extrude(cut_extrude5_sk1.sketch, amount=-CUT_EXTRUDE5_REACH, mode=Mode.PRIVATE) & part.part
    add(cut_extrude5_tool1.solids().sort_by_distance((-3.03784, 248.89358, 80.55))[0], mode=Mode.SUBTRACT)

    # Fillet2
    fillet2_edges = [part.edges().sort_by_distance(p)[0] for p in [
        (-1.51892, 268.78716, 48.8),
        (-1.51892, 268.78716, 112.3),
        (-1.51892, 229, 112.3),
        (-1.51892, 229, 48.8),
    ]]
    fillet(fillet2_edges, radius=FILLET2_R)

    # M8 Clearance Hole1
    with Locations(Plane.ZY.offset(3.03784)):
        with Locations((23.4, 255.05), (137.7, 255.05)):
            Hole(M8_CLEARANCE_HOLE1_D / 2, depth=M8_CLEARANCE_HOLE1_DEPTH)


solid = part.part
